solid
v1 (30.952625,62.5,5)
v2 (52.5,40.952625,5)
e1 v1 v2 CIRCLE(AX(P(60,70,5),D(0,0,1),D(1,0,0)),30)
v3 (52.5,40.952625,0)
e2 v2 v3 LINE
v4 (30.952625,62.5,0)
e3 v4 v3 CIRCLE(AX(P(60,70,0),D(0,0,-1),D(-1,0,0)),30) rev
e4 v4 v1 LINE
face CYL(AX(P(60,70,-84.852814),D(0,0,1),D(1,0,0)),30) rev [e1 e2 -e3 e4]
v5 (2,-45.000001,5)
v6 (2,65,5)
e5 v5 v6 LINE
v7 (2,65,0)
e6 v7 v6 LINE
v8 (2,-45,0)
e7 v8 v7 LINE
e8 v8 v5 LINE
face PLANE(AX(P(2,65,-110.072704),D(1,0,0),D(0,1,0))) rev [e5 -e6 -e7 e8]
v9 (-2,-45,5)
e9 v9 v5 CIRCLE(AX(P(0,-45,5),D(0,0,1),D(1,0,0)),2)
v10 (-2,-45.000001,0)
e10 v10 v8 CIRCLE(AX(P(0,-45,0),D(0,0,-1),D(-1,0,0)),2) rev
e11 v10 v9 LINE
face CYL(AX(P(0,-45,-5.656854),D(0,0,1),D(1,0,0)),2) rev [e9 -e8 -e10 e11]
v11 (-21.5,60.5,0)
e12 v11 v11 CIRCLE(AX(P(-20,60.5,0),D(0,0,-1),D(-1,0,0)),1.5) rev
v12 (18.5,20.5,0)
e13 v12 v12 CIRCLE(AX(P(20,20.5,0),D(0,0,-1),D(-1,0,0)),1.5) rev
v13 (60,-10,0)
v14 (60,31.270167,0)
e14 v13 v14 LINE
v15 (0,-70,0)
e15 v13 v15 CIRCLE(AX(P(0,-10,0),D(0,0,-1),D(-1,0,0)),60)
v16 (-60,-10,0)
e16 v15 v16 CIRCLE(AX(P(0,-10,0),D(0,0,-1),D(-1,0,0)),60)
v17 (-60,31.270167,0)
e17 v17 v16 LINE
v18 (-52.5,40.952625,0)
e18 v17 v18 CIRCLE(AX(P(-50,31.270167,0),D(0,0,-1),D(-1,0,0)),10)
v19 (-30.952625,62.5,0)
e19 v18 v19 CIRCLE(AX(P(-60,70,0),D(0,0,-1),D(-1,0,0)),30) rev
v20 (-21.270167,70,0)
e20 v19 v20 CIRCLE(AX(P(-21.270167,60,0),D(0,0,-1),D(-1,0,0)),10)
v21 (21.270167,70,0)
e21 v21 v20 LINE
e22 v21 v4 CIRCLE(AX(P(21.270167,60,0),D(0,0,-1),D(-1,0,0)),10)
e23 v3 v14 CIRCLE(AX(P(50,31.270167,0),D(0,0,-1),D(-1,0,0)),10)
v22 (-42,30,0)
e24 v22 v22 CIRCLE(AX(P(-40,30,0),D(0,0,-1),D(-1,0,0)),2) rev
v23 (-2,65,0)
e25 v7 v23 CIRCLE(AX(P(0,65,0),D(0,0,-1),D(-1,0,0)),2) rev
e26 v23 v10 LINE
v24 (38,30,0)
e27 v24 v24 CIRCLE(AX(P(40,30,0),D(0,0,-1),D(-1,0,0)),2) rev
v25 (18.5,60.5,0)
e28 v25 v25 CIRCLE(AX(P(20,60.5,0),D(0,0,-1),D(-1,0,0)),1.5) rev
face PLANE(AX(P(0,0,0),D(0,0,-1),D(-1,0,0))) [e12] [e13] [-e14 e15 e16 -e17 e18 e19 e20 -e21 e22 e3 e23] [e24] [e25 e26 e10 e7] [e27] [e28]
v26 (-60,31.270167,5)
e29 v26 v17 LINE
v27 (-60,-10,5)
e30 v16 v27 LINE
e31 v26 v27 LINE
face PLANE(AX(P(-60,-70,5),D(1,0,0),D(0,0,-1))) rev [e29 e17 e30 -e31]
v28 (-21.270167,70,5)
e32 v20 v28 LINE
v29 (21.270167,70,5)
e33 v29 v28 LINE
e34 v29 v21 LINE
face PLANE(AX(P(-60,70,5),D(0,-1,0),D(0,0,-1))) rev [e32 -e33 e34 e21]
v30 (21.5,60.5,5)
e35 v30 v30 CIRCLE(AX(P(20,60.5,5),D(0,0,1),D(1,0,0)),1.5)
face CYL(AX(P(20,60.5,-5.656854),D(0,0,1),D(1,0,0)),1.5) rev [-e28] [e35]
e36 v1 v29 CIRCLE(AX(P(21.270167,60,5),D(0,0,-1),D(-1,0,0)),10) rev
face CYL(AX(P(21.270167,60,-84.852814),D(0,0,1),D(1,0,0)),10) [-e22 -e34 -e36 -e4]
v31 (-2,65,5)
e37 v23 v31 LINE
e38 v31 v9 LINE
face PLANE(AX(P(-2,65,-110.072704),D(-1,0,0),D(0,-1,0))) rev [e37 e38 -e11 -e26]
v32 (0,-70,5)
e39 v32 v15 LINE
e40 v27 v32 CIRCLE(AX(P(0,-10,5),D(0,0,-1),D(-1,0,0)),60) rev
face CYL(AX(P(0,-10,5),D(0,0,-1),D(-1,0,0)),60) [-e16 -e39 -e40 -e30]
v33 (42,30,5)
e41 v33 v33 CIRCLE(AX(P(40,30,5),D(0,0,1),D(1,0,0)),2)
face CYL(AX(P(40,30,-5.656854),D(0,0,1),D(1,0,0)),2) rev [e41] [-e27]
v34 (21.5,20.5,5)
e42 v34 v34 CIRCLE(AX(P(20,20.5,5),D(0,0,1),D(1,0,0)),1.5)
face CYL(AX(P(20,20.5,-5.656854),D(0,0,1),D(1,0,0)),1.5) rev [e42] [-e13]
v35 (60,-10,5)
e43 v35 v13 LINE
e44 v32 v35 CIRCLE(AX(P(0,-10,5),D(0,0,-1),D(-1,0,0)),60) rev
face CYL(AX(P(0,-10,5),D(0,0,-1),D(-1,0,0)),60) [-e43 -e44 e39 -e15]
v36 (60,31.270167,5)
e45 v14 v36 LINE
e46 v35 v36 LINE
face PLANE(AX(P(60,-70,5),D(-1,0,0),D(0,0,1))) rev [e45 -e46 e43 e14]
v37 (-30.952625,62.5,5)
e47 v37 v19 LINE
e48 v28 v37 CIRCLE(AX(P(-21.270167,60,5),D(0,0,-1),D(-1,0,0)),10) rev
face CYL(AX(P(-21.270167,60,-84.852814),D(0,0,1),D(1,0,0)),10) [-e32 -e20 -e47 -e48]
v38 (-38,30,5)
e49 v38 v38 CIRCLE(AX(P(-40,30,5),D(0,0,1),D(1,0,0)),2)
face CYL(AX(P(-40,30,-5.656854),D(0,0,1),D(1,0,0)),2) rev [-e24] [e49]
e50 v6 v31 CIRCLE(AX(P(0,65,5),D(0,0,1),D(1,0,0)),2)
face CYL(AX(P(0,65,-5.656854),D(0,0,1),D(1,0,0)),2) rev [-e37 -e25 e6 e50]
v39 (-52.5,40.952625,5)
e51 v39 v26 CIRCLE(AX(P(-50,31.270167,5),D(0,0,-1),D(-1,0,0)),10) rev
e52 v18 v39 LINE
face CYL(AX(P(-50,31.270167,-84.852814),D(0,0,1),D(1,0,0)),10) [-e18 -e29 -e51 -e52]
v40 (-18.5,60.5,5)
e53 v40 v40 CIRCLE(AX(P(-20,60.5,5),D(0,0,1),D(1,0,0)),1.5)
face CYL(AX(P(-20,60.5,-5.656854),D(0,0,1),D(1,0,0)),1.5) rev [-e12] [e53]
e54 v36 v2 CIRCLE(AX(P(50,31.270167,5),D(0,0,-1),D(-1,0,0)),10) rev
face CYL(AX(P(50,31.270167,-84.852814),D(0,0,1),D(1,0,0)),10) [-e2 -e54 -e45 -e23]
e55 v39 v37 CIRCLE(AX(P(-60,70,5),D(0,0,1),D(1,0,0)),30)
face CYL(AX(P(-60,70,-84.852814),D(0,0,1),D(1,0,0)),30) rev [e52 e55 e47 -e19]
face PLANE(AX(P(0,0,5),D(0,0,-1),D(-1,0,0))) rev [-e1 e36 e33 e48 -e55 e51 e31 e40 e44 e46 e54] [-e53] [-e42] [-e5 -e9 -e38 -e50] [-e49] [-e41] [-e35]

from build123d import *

# Parameters (mm, degrees)
CROQUIS1_W              = 120
CROQUIS1_H              = 140
SALIENTE_EXTRUIR1_DEPTH = 5
CROQUIS2_R              = 2
CROQUIS2_R_2            = 1.5
CORTAR_EXTRUIR1_DEPTH   = 5
CROQUIS3_W              = 4
CROQUIS3_H              = 110.000000561
CORTAR_EXTRUIR2_DEPTH   = 5
CROQUIS5_R              = 30
CORTAR_EXTRUIR3_DEPTH   = 5
REDONDEO2_R             = 10
REDONDEO3_R             = 60


with BuildPart() as part:
    # Croquis1 → Saliente-Extruir1 (new body)
    with BuildSketch(Plane.XY):
        Rectangle(CROQUIS1_W, CROQUIS1_H)
    extrude(amount=SALIENTE_EXTRUIR1_DEPTH)

    # Croquis2 → Cortar-Extruir1 (cut)
    with BuildSketch(Plane.XY.offset(5)):
        with Locations((-40, 30)):
            Circle(CROQUIS2_R)
        with Locations((40, 30)):
            Circle(CROQUIS2_R)
        with Locations((0, 65)):
            Circle(CROQUIS2_R)
        with Locations((0, -45)):
            Circle(CROQUIS2_R)
        with Locations((-20, 60.5)):
            Circle(CROQUIS2_R_2)
        with Locations((20, 60.5)):
            Circle(CROQUIS2_R_2)
        with Locations((20, 20.5)):
            Circle(CROQUIS2_R_2)
    extrude(amount=-CORTAR_EXTRUIR1_DEPTH, mode=Mode.SUBTRACT)

    # Croquis3 → Cortar-Extruir2 (cut)
    with BuildSketch(Plane.XY.offset(5)):
        with Locations((0, 9.999999746)):
            Rectangle(CROQUIS3_W, CROQUIS3_H)
    extrude(amount=-CORTAR_EXTRUIR2_DEPTH, mode=Mode.SUBTRACT)

    # Croquis5 → Cortar-Extruir3 (cut)
    with BuildSketch(Plane.XY.offset(5)):
        with Locations((-60, 70)):
            Circle(CROQUIS5_R)
        with Locations((60, 70)):
            Circle(CROQUIS5_R)
    extrude(amount=-CORTAR_EXTRUIR3_DEPTH, mode=Mode.SUBTRACT)

    # Redondeo2
    redondeo2_edges = [part.edges().sort_by_distance(p)[0] for p in [
        (-30, 70, 2.5),
        (-60, 40, 2.5),
        (60, 40, 2.5),
        (30, 70, 2.5),
    ]]
    fillet(redondeo2_edges, radius=REDONDEO2_R)

    # Redondeo3
    redondeo3_edges = [part.edges().sort_by_distance(p)[0] for p in [
        (60, -70, 2.5),
        (-60, -70, 2.5),
    ]]
    fillet(redondeo3_edges, radius=REDONDEO3_R - 0.0001)  # a hair under: the kernel refuses the full size


solid = part.part
